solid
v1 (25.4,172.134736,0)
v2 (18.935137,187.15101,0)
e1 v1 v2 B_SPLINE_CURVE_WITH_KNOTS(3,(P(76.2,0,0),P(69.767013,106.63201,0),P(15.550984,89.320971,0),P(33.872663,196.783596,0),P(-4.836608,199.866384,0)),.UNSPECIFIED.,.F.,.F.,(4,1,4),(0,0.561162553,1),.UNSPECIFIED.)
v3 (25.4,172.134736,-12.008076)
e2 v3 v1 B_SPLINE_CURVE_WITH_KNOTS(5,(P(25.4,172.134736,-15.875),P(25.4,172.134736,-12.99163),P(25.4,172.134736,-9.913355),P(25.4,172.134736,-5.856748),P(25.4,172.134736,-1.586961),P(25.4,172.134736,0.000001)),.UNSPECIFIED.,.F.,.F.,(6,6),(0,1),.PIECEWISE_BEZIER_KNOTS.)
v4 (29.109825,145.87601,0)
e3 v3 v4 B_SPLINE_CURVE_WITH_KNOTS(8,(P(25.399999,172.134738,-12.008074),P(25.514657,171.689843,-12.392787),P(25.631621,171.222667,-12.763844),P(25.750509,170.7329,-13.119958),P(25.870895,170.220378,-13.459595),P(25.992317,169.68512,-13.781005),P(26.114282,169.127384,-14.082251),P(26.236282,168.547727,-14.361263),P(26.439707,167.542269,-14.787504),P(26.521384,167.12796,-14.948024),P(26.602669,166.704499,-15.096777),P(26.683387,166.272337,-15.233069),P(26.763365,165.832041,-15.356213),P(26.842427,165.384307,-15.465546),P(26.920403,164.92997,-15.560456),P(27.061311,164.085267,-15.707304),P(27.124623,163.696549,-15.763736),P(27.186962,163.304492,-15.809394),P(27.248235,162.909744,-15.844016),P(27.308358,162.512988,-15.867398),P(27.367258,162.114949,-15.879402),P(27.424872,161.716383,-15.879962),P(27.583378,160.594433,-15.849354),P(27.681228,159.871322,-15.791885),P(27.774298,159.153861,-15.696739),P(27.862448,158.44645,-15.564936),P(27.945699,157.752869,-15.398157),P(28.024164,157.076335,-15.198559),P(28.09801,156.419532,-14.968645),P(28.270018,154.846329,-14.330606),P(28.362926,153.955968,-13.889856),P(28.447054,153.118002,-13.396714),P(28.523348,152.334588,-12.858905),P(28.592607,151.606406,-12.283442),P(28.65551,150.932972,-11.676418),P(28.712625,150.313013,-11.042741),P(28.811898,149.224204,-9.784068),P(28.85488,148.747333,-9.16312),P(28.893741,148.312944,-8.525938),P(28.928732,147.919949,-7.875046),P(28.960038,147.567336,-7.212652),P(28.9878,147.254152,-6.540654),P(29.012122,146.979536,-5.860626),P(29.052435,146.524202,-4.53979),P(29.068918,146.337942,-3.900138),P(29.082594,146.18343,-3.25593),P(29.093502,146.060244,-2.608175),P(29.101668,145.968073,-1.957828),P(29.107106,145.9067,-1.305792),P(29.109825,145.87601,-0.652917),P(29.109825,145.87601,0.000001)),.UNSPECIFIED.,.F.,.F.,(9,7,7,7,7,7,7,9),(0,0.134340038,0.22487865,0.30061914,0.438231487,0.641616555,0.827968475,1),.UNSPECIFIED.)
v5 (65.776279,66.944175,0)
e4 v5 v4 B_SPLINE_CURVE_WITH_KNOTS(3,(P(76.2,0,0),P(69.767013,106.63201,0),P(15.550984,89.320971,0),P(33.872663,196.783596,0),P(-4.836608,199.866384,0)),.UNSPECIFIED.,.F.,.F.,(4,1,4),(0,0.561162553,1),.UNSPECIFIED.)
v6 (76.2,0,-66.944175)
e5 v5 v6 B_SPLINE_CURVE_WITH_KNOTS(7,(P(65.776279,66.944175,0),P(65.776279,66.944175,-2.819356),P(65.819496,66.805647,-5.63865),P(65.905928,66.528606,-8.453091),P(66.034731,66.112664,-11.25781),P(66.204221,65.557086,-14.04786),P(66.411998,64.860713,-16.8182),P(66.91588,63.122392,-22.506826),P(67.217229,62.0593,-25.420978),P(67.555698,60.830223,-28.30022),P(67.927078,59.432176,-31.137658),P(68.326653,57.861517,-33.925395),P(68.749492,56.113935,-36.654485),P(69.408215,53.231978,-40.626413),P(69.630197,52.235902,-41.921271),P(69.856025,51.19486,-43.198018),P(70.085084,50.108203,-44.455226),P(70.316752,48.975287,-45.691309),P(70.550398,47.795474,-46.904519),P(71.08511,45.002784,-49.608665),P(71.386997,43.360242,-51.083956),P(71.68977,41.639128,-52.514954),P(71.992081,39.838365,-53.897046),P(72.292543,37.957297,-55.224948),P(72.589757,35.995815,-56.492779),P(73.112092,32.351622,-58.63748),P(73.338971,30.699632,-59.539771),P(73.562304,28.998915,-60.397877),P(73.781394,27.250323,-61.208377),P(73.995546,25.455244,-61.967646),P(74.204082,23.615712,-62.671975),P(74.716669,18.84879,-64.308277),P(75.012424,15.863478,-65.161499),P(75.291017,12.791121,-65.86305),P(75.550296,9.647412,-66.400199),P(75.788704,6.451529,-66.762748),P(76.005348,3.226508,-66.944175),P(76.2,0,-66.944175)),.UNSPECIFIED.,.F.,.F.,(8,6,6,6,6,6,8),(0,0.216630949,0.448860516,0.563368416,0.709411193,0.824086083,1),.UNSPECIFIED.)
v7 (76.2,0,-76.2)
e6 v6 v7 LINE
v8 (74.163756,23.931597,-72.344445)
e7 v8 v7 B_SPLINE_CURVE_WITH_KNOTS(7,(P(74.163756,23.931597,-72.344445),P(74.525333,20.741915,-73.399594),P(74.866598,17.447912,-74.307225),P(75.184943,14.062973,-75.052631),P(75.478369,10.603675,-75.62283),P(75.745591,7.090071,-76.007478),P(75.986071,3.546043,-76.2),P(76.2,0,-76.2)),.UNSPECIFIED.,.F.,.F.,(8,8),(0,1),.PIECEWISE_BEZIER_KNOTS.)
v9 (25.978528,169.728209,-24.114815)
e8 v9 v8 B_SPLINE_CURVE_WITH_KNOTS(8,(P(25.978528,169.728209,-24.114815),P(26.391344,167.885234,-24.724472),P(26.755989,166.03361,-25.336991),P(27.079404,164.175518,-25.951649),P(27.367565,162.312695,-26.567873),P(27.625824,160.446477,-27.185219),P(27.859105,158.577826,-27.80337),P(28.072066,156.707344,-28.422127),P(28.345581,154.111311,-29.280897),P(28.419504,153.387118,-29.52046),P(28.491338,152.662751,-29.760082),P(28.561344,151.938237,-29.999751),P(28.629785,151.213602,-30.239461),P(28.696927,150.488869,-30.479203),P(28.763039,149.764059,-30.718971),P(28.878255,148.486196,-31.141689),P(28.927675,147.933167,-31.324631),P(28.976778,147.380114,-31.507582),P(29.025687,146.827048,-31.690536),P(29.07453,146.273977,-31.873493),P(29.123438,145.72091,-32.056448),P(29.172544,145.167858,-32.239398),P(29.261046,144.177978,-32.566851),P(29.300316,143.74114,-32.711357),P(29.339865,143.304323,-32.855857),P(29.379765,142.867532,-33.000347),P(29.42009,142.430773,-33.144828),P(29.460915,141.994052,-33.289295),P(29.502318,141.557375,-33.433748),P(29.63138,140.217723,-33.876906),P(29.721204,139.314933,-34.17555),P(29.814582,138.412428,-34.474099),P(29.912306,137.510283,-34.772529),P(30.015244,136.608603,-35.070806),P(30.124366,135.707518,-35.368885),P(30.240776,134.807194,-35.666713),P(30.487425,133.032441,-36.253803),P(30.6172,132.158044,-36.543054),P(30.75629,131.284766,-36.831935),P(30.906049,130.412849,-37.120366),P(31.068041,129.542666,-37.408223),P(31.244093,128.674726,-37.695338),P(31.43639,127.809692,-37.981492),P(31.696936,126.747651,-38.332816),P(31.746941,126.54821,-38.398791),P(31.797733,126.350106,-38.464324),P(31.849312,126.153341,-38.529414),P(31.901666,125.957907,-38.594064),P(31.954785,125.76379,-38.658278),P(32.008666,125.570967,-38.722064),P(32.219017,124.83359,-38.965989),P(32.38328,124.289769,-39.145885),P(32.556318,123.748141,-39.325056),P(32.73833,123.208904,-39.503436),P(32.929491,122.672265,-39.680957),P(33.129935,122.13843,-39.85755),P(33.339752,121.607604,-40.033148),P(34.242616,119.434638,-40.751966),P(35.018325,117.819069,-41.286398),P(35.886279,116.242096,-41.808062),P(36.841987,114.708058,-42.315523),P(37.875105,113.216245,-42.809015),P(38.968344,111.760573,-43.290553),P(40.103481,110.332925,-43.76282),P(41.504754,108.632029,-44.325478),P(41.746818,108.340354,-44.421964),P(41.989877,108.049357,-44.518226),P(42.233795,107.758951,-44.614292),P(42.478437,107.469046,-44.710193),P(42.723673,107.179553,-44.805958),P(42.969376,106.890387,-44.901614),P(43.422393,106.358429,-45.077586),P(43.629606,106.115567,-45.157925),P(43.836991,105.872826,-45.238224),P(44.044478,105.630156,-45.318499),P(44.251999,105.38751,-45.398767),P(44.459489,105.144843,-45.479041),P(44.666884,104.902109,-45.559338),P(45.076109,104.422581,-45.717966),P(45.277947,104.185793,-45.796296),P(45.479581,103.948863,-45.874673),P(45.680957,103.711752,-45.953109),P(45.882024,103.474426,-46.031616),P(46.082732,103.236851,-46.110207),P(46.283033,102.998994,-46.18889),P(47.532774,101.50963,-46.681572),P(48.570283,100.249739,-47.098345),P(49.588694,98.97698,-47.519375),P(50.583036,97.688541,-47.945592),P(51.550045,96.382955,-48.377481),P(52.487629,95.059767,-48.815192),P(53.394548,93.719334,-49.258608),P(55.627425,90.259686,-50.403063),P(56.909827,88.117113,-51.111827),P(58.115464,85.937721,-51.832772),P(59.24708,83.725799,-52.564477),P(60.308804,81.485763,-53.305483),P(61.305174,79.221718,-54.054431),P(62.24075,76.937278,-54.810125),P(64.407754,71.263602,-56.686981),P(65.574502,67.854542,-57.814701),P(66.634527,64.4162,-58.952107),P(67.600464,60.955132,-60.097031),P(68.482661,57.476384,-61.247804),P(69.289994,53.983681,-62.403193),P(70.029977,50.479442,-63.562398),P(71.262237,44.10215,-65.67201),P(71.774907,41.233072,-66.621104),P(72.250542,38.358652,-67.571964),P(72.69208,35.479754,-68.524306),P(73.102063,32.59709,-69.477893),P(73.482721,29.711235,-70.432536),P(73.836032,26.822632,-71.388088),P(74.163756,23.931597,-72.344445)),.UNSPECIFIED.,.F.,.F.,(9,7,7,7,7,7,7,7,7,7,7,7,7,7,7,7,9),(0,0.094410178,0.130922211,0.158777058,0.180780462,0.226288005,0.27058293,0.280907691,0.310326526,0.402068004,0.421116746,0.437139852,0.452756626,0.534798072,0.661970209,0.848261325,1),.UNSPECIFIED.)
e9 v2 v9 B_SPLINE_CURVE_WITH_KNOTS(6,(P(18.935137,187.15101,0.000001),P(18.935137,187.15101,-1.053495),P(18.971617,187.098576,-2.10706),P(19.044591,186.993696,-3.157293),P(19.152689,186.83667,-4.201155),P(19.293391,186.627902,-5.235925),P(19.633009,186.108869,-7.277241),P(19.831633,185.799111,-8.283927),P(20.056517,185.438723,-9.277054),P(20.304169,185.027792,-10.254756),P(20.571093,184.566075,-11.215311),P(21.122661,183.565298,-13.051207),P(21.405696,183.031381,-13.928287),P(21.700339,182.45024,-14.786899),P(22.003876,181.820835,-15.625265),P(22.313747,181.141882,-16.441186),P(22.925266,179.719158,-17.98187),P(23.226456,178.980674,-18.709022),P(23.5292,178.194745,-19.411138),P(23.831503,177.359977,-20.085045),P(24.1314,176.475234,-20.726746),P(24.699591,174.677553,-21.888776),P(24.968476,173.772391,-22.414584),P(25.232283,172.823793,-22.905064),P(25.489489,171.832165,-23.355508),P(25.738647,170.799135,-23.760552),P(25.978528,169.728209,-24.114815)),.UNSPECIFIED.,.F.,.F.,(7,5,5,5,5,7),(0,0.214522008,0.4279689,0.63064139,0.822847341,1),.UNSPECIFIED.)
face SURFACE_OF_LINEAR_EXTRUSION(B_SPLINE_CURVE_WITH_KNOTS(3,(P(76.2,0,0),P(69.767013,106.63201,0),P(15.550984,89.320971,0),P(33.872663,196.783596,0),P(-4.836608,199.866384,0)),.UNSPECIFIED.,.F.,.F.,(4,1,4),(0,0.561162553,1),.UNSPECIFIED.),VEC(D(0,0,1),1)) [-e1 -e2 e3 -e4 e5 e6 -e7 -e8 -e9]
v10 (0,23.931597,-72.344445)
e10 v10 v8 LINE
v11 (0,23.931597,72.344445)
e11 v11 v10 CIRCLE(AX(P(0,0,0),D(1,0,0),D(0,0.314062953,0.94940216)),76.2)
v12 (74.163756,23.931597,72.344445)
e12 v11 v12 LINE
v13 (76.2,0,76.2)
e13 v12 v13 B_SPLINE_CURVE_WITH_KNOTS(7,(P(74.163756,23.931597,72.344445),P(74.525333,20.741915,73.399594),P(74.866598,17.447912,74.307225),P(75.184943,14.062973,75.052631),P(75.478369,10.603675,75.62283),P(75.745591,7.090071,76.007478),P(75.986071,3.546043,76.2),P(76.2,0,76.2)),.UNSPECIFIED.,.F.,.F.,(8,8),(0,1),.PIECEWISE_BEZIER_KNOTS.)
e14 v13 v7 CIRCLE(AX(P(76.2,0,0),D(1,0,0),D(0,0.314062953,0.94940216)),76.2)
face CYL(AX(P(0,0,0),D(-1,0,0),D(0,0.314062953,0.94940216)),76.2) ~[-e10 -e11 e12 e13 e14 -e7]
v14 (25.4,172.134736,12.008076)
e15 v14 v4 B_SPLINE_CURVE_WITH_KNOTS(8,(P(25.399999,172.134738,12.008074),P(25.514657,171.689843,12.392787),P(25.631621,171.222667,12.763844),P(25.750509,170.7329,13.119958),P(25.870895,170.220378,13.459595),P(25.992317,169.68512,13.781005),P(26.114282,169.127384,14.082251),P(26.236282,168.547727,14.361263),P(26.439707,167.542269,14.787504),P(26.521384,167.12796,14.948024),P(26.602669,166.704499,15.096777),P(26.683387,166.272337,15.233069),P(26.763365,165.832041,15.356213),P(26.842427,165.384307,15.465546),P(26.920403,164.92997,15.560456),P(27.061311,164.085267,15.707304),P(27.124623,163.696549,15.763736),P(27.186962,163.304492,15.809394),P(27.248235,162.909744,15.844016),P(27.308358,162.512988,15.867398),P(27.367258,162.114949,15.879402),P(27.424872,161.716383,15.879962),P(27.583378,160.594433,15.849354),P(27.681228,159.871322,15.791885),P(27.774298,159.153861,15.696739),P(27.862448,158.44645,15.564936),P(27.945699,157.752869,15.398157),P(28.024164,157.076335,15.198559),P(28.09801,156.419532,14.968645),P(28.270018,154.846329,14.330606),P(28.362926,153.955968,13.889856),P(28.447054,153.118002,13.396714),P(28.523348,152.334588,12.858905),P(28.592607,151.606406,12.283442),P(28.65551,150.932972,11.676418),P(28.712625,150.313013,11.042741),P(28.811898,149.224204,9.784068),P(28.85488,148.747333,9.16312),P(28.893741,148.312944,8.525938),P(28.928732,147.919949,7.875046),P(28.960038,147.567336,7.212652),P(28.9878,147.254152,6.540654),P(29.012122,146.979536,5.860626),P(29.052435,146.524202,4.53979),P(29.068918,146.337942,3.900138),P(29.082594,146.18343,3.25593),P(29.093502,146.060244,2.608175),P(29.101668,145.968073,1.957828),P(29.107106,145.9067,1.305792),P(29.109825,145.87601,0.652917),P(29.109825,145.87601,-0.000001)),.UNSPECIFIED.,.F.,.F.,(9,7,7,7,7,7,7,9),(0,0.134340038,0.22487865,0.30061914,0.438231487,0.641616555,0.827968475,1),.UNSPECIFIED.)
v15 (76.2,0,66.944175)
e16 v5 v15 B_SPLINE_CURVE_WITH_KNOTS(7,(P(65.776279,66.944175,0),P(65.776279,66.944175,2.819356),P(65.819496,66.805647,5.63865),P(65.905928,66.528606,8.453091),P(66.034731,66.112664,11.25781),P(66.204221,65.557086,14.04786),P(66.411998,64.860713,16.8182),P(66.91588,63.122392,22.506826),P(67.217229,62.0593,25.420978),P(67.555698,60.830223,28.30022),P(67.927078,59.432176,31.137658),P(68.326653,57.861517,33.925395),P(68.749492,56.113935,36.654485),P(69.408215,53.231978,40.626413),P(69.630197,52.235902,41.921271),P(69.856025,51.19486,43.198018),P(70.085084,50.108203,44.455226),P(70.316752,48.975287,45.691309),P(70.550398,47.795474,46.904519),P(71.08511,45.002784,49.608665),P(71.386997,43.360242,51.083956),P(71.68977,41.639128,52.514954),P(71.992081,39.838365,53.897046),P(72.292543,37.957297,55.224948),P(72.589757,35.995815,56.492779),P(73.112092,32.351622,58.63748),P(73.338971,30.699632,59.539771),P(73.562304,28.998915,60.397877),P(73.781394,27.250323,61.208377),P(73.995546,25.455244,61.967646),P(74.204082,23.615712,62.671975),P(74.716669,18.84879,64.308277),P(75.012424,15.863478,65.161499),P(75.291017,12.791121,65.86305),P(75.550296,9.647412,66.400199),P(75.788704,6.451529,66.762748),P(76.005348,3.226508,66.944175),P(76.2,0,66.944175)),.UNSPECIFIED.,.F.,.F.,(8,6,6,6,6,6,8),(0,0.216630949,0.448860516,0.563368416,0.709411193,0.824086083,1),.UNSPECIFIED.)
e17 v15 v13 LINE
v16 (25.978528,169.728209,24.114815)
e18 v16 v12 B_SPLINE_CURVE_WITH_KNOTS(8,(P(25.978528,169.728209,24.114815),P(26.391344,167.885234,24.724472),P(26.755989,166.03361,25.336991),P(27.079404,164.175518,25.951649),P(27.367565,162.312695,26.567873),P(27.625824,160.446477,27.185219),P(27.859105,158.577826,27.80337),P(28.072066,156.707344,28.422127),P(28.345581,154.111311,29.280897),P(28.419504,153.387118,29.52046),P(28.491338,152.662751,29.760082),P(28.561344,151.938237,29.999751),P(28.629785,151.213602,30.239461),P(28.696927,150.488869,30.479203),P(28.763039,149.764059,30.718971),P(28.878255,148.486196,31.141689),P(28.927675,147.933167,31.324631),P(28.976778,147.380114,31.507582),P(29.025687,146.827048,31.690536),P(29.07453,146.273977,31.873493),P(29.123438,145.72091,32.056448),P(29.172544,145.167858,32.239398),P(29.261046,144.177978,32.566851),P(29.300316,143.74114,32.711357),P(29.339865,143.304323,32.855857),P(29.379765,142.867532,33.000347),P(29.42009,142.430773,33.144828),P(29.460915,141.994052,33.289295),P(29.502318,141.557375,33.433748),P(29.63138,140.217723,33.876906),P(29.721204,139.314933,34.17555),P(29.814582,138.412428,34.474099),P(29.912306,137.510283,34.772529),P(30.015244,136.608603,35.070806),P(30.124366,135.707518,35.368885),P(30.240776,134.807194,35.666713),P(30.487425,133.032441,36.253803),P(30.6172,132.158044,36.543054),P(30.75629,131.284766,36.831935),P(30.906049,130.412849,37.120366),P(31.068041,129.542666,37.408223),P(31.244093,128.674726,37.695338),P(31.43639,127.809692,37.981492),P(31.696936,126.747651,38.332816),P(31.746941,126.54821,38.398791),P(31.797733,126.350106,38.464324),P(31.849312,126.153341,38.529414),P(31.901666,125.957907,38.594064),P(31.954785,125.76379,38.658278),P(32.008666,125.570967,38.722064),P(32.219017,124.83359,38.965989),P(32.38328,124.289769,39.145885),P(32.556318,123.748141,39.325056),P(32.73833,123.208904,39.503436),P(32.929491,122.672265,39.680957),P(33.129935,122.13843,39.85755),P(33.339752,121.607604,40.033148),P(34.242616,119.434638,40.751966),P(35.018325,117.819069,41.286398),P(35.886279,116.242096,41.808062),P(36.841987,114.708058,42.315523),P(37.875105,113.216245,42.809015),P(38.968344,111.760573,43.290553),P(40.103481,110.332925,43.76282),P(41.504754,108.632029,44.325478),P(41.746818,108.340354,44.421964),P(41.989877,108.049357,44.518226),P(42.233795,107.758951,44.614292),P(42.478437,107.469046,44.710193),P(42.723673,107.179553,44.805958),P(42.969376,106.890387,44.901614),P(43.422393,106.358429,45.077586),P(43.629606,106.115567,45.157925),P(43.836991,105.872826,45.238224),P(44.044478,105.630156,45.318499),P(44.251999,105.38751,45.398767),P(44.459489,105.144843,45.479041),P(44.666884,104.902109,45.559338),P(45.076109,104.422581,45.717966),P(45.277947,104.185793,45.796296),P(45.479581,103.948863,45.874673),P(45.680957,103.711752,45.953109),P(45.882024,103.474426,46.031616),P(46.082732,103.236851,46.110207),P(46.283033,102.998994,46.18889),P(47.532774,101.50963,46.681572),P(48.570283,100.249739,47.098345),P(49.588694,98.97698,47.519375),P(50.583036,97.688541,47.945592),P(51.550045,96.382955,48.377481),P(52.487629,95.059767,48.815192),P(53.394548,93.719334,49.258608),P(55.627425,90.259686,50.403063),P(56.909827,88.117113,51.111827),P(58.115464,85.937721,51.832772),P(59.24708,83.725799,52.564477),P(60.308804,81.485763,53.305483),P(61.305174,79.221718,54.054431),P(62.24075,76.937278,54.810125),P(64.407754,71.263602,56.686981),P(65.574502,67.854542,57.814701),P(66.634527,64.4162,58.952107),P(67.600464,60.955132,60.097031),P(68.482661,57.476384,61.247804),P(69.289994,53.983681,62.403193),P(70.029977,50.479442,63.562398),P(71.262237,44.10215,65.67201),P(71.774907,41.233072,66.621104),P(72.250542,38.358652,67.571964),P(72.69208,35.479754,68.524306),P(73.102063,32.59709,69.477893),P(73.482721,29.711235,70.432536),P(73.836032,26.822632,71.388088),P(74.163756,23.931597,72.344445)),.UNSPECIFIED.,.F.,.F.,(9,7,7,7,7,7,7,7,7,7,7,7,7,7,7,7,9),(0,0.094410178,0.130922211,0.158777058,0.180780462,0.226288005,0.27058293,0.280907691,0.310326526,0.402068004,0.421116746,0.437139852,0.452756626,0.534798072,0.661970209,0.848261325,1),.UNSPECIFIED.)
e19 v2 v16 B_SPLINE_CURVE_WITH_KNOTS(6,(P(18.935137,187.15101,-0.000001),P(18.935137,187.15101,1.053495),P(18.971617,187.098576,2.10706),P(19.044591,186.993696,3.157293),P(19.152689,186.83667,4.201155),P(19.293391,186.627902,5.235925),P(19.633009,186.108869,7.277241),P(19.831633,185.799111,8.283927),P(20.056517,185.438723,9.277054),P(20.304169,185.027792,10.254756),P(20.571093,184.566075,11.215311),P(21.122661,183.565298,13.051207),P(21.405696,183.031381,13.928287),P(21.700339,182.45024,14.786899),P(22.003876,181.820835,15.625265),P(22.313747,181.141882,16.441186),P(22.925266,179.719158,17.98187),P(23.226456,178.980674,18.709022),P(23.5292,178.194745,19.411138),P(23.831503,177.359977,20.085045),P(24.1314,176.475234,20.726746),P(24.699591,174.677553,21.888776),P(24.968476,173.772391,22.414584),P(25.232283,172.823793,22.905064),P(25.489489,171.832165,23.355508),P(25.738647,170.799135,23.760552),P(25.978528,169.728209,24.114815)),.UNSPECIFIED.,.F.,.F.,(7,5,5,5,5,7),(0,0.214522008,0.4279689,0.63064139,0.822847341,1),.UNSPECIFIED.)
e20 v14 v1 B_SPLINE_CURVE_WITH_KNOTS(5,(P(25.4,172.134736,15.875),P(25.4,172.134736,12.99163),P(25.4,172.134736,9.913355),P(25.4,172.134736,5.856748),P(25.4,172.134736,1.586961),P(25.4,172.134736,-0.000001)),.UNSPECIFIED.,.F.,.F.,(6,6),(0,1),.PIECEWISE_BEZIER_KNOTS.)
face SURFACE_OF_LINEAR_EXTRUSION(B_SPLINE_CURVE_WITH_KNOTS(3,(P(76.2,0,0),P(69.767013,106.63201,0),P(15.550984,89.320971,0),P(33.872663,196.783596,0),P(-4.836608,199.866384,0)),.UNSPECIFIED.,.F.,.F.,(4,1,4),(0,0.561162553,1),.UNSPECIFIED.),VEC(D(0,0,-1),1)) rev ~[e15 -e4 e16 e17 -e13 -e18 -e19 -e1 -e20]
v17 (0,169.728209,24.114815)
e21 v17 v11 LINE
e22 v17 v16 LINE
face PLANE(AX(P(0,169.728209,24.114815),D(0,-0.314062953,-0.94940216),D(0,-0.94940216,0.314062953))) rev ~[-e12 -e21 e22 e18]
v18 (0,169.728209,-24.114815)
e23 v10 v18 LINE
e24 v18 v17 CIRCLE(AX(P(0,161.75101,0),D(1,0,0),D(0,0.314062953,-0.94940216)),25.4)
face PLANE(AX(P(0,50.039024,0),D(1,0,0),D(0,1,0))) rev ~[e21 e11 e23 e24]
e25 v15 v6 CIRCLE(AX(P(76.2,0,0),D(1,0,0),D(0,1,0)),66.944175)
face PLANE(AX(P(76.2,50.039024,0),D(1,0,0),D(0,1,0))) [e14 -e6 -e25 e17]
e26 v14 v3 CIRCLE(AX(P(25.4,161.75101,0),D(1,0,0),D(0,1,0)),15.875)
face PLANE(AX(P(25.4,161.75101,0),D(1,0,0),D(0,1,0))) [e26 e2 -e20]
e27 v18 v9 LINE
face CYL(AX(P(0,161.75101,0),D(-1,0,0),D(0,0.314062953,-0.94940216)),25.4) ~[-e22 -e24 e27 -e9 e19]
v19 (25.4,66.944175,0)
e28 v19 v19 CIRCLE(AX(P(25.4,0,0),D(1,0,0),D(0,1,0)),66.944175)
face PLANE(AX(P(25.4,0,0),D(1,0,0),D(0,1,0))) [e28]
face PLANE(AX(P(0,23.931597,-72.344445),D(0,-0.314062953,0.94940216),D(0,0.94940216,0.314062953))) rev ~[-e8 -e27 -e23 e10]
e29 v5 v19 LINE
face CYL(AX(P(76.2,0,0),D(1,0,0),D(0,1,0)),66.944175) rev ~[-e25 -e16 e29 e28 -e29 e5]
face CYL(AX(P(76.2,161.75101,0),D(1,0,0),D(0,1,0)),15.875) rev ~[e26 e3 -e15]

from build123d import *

# Parameters (mm, degrees)
F1_DEPTH = 76.2
F2_R     = 66.9441745007
F2_R_2   = 15.875
F3_DEPTH = 50.8
F5_DEPTH = 137.16


# Not quite as in the source:
# - a feature names something its author has since deleted; it is built from what else it names


with BuildPart() as f1:
    # F0 (on Right) → F1 (new body)
    with BuildSketch(Plane.YZ):
        with BuildLine():
            Line((169.7282094477, 24.1148148653), (23.9315970236, 72.344444596))
            ThreePointArc((23.9315970236, 72.344444596), (-76.2, 0), (23.9315970236, -72.344444596))
            Line((23.9315970236, -72.344444596), (169.7282094477, -24.1148148653))
            ThreePointArc((169.7282094477, -24.1148148653), (187.1510104398, 0), (169.7282094477, 24.1148148653))
        make_face()
    extrude(amount=F1_DEPTH)

    # F2 (on face) → F3 (cut)
    with BuildSketch(Plane.YZ.offset(76.2)):
        Circle(F2_R)
        with Locations((161.7510104398, 0)):
            Circle(F2_R_2)
    extrude(amount=-F3_DEPTH, mode=Mode.SUBTRACT)

    # F4 (on Top) → F5 (cut, symmetric)
    with BuildSketch(Plane.XY):
        with BuildLine():
            add(Edge.make_bspline(
                [(76.2, 0), (69.7670128122, 106.6320095463), (15.5509841332, 89.3209706266), (33.872663393, 196.783595894), (-4.8366077244, 199.8663842678)],
                knots=[0, 0, 0, 0, 0.5611625531, 1, 1, 1, 1], degree=3))
            Line((76.2, 0), (76.2, 199.8663842678))
            Line((76.2, 199.8663842678), (-4.8366077244, 199.8663842678))
        make_face()
    extrude(amount=F5_DEPTH, both=True, mode=Mode.SUBTRACT)


solid = f1.part
